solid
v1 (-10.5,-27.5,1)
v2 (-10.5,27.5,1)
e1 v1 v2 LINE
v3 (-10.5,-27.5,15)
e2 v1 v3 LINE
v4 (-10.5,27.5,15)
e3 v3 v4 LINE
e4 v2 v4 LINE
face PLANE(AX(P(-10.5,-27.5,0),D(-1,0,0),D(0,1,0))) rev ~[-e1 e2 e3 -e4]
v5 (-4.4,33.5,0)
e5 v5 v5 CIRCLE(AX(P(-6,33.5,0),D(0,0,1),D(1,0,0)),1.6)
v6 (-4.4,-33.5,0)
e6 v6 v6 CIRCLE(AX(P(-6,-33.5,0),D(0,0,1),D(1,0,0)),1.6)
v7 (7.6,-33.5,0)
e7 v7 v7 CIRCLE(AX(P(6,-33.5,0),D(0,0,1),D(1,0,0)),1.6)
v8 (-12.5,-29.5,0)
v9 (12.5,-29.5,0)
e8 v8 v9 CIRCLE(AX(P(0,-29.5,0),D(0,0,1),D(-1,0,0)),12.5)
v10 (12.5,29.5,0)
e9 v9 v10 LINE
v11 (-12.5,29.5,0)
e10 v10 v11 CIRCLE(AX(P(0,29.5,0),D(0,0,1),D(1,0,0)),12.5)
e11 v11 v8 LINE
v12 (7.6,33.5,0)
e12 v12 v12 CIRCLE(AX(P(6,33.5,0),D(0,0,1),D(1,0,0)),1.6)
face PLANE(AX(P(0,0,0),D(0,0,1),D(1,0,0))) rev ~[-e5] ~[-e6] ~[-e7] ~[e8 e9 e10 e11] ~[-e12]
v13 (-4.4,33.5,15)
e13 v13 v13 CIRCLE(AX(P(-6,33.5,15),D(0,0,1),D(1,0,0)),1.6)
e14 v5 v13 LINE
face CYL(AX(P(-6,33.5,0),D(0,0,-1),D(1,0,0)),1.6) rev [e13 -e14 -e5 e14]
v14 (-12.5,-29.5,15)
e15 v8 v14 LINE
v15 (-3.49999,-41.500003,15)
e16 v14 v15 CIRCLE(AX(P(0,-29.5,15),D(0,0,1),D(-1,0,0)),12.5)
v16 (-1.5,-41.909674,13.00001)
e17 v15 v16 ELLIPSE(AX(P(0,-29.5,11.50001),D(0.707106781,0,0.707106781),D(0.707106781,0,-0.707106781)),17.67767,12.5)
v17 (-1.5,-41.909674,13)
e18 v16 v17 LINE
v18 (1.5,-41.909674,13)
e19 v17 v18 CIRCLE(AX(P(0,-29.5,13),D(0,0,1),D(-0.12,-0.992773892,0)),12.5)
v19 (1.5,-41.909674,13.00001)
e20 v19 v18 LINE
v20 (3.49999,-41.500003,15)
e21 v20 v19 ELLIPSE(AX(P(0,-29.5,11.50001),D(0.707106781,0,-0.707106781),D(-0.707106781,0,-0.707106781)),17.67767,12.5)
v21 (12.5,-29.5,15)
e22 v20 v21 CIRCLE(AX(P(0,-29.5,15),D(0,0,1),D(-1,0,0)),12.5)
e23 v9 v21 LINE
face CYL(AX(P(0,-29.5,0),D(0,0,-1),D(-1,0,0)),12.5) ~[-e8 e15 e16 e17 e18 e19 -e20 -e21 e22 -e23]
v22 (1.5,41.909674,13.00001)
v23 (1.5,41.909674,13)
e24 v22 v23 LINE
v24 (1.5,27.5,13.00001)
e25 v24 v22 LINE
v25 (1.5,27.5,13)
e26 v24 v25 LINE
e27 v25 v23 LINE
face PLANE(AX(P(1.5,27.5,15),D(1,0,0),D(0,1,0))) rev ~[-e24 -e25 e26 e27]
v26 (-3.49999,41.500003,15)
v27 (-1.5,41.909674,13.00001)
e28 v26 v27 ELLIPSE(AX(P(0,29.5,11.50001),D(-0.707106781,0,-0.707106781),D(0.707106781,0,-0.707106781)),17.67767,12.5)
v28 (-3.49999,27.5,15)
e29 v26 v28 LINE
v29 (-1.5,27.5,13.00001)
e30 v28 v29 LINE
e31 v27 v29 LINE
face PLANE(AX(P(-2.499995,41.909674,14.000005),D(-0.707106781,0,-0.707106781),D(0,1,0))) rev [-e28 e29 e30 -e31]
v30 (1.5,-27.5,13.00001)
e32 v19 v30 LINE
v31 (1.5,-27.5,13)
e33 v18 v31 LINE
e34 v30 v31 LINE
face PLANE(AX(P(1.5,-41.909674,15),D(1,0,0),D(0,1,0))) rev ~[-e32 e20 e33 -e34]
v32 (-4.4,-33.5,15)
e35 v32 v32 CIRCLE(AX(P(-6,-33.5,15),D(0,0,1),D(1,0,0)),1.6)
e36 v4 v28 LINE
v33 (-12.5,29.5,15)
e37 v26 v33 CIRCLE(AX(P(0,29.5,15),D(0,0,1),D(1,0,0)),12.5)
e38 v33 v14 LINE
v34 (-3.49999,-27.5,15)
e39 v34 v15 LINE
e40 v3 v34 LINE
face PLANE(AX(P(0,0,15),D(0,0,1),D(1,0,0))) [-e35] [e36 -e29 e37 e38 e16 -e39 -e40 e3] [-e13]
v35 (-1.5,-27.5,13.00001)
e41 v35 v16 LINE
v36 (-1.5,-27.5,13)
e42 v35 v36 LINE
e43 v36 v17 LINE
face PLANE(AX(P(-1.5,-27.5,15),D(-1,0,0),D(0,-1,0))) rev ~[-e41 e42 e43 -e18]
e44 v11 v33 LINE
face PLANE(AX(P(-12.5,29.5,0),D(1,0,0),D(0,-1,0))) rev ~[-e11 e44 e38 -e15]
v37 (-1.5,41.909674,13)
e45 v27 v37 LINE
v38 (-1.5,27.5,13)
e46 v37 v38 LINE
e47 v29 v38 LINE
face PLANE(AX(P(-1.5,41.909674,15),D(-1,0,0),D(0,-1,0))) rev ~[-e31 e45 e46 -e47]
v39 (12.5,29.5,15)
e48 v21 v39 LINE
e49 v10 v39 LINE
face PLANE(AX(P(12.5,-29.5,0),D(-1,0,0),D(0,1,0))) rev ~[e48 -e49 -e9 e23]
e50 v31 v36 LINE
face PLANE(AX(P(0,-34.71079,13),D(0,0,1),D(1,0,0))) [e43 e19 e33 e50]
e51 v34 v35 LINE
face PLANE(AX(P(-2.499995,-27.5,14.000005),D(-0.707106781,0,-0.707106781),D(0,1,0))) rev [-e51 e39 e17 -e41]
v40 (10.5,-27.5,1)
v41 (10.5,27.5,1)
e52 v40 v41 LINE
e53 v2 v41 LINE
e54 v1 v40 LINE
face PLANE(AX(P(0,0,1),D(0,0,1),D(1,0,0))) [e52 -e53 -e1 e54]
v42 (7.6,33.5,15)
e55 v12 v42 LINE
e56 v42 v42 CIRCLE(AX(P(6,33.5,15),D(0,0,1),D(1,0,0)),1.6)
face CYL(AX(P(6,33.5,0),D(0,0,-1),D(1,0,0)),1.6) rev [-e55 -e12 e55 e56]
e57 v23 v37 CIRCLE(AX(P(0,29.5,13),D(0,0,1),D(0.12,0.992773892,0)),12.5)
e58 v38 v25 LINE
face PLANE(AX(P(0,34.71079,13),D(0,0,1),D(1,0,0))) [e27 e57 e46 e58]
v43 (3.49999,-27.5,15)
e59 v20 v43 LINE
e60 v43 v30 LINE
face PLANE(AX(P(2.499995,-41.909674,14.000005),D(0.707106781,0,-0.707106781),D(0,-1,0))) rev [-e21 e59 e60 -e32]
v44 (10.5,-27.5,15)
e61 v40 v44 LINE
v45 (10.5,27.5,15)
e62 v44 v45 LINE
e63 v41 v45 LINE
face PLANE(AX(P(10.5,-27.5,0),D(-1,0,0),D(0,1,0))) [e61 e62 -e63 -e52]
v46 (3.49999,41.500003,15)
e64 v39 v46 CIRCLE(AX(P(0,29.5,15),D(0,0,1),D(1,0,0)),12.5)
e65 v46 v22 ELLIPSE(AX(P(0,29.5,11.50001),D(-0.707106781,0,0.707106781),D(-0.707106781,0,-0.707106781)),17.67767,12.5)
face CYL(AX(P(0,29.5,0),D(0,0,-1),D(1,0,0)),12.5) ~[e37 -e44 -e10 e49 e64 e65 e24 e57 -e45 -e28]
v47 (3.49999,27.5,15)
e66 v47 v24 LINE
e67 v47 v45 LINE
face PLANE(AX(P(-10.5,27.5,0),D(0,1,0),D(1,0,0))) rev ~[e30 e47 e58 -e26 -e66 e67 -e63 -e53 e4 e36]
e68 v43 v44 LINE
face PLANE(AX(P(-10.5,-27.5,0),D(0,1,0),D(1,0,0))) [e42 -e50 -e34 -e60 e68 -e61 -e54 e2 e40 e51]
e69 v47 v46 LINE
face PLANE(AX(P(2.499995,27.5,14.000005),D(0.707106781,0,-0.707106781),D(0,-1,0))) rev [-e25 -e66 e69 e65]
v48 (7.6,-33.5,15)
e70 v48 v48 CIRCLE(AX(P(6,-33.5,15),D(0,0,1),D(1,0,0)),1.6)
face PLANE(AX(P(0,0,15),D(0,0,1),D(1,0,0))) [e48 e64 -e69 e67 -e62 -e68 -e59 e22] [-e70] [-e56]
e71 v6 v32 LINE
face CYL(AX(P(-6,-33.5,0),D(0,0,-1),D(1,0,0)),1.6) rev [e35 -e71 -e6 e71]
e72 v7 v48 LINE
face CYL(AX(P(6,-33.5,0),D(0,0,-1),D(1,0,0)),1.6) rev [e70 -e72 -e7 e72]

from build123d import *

# Parameters (mm, degrees)
F0_R     = 1.6
F0_W     = 21
F0_H     = 55
F1_DEPTH = 15
F2_W     = 22.6258952171
F2_H     = 57.1813471615
F3_DEPTH = 1
F5_DEPTH = 2
F6_SIZE  = 1.99999


# Not quite as in the source:
# - a fillet or chamfer is up to 0.001 mm smaller than in the source, because OpenCascade refuses the exact size


with BuildPart() as f1:
    # F0 (on Top) → F1 (new body)
    with BuildSketch(Plane.XY):
        with BuildLine():
            Line((12.5, -29.5), (12.5, 29.5))
            ThreePointArc((12.5, 29.5), (0, 42), (-12.5, 29.5))
            Line((-12.5, 29.5), (-12.5, -29.5))
            ThreePointArc((-12.5, -29.5), (0, -42), (12.5, -29.5))
        make_face()
        with Locations((-6, -33.5)):
            Circle(F0_R, mode=Mode.SUBTRACT)
        with Locations((6, -33.5)):
            Circle(F0_R, mode=Mode.SUBTRACT)
        with Locations((-6, 33.5)):
            Circle(F0_R, mode=Mode.SUBTRACT)
        Rectangle(F0_W, F0_H, mode=Mode.SUBTRACT)
        with Locations((6, 33.5)):
            Circle(F0_R, mode=Mode.SUBTRACT)
    extrude(amount=F1_DEPTH)

    # F2 (on Top) → F3 (join)
    with BuildSketch(Plane.XY):
        Rectangle(F2_W, F2_H)
    extrude(amount=F3_DEPTH)

    # F4 (on face) → F5 (cut)
    with BuildSketch(Plane.XY.offset(15)):
        with BuildLine():
            ThreePointArc((1.5, 41.909673646), (0, 42), (-1.5, 41.909673646))
            Line((-1.5, 41.909673646), (-1.5, 27.5))
            Line((-1.5, 27.5), (1.5, 27.5))
            Line((1.5, 27.5), (1.5, 41.909673646))
        make_face()
        with BuildLine():
            Line((1.5, -27.5), (-1.5, -27.5))
            Line((-1.5, -27.5), (-1.5, -41.909673646))
            ThreePointArc((-1.5, -41.909673646), (0, -42), (1.5, -41.909673646))
            Line((1.5, -41.909673646), (1.5, -27.5))
        make_face()
    extrude(amount=-F5_DEPTH, mode=Mode.SUBTRACT)

    # F6 (size 2 in the source; OpenCascade refuses exactly that, so slightly less here)
    f6_edges = [f1.edges().sort_by_distance(p)[0] for p in [
        (-1.5, 34.704837, 15),
        (1.5, 34.704837, 15),
        (1.5, -34.704837, 15),
        (-1.5, -34.704837, 15),
    ]]
    chamfer(f6_edges, length=F6_SIZE)


solid = f1.part
